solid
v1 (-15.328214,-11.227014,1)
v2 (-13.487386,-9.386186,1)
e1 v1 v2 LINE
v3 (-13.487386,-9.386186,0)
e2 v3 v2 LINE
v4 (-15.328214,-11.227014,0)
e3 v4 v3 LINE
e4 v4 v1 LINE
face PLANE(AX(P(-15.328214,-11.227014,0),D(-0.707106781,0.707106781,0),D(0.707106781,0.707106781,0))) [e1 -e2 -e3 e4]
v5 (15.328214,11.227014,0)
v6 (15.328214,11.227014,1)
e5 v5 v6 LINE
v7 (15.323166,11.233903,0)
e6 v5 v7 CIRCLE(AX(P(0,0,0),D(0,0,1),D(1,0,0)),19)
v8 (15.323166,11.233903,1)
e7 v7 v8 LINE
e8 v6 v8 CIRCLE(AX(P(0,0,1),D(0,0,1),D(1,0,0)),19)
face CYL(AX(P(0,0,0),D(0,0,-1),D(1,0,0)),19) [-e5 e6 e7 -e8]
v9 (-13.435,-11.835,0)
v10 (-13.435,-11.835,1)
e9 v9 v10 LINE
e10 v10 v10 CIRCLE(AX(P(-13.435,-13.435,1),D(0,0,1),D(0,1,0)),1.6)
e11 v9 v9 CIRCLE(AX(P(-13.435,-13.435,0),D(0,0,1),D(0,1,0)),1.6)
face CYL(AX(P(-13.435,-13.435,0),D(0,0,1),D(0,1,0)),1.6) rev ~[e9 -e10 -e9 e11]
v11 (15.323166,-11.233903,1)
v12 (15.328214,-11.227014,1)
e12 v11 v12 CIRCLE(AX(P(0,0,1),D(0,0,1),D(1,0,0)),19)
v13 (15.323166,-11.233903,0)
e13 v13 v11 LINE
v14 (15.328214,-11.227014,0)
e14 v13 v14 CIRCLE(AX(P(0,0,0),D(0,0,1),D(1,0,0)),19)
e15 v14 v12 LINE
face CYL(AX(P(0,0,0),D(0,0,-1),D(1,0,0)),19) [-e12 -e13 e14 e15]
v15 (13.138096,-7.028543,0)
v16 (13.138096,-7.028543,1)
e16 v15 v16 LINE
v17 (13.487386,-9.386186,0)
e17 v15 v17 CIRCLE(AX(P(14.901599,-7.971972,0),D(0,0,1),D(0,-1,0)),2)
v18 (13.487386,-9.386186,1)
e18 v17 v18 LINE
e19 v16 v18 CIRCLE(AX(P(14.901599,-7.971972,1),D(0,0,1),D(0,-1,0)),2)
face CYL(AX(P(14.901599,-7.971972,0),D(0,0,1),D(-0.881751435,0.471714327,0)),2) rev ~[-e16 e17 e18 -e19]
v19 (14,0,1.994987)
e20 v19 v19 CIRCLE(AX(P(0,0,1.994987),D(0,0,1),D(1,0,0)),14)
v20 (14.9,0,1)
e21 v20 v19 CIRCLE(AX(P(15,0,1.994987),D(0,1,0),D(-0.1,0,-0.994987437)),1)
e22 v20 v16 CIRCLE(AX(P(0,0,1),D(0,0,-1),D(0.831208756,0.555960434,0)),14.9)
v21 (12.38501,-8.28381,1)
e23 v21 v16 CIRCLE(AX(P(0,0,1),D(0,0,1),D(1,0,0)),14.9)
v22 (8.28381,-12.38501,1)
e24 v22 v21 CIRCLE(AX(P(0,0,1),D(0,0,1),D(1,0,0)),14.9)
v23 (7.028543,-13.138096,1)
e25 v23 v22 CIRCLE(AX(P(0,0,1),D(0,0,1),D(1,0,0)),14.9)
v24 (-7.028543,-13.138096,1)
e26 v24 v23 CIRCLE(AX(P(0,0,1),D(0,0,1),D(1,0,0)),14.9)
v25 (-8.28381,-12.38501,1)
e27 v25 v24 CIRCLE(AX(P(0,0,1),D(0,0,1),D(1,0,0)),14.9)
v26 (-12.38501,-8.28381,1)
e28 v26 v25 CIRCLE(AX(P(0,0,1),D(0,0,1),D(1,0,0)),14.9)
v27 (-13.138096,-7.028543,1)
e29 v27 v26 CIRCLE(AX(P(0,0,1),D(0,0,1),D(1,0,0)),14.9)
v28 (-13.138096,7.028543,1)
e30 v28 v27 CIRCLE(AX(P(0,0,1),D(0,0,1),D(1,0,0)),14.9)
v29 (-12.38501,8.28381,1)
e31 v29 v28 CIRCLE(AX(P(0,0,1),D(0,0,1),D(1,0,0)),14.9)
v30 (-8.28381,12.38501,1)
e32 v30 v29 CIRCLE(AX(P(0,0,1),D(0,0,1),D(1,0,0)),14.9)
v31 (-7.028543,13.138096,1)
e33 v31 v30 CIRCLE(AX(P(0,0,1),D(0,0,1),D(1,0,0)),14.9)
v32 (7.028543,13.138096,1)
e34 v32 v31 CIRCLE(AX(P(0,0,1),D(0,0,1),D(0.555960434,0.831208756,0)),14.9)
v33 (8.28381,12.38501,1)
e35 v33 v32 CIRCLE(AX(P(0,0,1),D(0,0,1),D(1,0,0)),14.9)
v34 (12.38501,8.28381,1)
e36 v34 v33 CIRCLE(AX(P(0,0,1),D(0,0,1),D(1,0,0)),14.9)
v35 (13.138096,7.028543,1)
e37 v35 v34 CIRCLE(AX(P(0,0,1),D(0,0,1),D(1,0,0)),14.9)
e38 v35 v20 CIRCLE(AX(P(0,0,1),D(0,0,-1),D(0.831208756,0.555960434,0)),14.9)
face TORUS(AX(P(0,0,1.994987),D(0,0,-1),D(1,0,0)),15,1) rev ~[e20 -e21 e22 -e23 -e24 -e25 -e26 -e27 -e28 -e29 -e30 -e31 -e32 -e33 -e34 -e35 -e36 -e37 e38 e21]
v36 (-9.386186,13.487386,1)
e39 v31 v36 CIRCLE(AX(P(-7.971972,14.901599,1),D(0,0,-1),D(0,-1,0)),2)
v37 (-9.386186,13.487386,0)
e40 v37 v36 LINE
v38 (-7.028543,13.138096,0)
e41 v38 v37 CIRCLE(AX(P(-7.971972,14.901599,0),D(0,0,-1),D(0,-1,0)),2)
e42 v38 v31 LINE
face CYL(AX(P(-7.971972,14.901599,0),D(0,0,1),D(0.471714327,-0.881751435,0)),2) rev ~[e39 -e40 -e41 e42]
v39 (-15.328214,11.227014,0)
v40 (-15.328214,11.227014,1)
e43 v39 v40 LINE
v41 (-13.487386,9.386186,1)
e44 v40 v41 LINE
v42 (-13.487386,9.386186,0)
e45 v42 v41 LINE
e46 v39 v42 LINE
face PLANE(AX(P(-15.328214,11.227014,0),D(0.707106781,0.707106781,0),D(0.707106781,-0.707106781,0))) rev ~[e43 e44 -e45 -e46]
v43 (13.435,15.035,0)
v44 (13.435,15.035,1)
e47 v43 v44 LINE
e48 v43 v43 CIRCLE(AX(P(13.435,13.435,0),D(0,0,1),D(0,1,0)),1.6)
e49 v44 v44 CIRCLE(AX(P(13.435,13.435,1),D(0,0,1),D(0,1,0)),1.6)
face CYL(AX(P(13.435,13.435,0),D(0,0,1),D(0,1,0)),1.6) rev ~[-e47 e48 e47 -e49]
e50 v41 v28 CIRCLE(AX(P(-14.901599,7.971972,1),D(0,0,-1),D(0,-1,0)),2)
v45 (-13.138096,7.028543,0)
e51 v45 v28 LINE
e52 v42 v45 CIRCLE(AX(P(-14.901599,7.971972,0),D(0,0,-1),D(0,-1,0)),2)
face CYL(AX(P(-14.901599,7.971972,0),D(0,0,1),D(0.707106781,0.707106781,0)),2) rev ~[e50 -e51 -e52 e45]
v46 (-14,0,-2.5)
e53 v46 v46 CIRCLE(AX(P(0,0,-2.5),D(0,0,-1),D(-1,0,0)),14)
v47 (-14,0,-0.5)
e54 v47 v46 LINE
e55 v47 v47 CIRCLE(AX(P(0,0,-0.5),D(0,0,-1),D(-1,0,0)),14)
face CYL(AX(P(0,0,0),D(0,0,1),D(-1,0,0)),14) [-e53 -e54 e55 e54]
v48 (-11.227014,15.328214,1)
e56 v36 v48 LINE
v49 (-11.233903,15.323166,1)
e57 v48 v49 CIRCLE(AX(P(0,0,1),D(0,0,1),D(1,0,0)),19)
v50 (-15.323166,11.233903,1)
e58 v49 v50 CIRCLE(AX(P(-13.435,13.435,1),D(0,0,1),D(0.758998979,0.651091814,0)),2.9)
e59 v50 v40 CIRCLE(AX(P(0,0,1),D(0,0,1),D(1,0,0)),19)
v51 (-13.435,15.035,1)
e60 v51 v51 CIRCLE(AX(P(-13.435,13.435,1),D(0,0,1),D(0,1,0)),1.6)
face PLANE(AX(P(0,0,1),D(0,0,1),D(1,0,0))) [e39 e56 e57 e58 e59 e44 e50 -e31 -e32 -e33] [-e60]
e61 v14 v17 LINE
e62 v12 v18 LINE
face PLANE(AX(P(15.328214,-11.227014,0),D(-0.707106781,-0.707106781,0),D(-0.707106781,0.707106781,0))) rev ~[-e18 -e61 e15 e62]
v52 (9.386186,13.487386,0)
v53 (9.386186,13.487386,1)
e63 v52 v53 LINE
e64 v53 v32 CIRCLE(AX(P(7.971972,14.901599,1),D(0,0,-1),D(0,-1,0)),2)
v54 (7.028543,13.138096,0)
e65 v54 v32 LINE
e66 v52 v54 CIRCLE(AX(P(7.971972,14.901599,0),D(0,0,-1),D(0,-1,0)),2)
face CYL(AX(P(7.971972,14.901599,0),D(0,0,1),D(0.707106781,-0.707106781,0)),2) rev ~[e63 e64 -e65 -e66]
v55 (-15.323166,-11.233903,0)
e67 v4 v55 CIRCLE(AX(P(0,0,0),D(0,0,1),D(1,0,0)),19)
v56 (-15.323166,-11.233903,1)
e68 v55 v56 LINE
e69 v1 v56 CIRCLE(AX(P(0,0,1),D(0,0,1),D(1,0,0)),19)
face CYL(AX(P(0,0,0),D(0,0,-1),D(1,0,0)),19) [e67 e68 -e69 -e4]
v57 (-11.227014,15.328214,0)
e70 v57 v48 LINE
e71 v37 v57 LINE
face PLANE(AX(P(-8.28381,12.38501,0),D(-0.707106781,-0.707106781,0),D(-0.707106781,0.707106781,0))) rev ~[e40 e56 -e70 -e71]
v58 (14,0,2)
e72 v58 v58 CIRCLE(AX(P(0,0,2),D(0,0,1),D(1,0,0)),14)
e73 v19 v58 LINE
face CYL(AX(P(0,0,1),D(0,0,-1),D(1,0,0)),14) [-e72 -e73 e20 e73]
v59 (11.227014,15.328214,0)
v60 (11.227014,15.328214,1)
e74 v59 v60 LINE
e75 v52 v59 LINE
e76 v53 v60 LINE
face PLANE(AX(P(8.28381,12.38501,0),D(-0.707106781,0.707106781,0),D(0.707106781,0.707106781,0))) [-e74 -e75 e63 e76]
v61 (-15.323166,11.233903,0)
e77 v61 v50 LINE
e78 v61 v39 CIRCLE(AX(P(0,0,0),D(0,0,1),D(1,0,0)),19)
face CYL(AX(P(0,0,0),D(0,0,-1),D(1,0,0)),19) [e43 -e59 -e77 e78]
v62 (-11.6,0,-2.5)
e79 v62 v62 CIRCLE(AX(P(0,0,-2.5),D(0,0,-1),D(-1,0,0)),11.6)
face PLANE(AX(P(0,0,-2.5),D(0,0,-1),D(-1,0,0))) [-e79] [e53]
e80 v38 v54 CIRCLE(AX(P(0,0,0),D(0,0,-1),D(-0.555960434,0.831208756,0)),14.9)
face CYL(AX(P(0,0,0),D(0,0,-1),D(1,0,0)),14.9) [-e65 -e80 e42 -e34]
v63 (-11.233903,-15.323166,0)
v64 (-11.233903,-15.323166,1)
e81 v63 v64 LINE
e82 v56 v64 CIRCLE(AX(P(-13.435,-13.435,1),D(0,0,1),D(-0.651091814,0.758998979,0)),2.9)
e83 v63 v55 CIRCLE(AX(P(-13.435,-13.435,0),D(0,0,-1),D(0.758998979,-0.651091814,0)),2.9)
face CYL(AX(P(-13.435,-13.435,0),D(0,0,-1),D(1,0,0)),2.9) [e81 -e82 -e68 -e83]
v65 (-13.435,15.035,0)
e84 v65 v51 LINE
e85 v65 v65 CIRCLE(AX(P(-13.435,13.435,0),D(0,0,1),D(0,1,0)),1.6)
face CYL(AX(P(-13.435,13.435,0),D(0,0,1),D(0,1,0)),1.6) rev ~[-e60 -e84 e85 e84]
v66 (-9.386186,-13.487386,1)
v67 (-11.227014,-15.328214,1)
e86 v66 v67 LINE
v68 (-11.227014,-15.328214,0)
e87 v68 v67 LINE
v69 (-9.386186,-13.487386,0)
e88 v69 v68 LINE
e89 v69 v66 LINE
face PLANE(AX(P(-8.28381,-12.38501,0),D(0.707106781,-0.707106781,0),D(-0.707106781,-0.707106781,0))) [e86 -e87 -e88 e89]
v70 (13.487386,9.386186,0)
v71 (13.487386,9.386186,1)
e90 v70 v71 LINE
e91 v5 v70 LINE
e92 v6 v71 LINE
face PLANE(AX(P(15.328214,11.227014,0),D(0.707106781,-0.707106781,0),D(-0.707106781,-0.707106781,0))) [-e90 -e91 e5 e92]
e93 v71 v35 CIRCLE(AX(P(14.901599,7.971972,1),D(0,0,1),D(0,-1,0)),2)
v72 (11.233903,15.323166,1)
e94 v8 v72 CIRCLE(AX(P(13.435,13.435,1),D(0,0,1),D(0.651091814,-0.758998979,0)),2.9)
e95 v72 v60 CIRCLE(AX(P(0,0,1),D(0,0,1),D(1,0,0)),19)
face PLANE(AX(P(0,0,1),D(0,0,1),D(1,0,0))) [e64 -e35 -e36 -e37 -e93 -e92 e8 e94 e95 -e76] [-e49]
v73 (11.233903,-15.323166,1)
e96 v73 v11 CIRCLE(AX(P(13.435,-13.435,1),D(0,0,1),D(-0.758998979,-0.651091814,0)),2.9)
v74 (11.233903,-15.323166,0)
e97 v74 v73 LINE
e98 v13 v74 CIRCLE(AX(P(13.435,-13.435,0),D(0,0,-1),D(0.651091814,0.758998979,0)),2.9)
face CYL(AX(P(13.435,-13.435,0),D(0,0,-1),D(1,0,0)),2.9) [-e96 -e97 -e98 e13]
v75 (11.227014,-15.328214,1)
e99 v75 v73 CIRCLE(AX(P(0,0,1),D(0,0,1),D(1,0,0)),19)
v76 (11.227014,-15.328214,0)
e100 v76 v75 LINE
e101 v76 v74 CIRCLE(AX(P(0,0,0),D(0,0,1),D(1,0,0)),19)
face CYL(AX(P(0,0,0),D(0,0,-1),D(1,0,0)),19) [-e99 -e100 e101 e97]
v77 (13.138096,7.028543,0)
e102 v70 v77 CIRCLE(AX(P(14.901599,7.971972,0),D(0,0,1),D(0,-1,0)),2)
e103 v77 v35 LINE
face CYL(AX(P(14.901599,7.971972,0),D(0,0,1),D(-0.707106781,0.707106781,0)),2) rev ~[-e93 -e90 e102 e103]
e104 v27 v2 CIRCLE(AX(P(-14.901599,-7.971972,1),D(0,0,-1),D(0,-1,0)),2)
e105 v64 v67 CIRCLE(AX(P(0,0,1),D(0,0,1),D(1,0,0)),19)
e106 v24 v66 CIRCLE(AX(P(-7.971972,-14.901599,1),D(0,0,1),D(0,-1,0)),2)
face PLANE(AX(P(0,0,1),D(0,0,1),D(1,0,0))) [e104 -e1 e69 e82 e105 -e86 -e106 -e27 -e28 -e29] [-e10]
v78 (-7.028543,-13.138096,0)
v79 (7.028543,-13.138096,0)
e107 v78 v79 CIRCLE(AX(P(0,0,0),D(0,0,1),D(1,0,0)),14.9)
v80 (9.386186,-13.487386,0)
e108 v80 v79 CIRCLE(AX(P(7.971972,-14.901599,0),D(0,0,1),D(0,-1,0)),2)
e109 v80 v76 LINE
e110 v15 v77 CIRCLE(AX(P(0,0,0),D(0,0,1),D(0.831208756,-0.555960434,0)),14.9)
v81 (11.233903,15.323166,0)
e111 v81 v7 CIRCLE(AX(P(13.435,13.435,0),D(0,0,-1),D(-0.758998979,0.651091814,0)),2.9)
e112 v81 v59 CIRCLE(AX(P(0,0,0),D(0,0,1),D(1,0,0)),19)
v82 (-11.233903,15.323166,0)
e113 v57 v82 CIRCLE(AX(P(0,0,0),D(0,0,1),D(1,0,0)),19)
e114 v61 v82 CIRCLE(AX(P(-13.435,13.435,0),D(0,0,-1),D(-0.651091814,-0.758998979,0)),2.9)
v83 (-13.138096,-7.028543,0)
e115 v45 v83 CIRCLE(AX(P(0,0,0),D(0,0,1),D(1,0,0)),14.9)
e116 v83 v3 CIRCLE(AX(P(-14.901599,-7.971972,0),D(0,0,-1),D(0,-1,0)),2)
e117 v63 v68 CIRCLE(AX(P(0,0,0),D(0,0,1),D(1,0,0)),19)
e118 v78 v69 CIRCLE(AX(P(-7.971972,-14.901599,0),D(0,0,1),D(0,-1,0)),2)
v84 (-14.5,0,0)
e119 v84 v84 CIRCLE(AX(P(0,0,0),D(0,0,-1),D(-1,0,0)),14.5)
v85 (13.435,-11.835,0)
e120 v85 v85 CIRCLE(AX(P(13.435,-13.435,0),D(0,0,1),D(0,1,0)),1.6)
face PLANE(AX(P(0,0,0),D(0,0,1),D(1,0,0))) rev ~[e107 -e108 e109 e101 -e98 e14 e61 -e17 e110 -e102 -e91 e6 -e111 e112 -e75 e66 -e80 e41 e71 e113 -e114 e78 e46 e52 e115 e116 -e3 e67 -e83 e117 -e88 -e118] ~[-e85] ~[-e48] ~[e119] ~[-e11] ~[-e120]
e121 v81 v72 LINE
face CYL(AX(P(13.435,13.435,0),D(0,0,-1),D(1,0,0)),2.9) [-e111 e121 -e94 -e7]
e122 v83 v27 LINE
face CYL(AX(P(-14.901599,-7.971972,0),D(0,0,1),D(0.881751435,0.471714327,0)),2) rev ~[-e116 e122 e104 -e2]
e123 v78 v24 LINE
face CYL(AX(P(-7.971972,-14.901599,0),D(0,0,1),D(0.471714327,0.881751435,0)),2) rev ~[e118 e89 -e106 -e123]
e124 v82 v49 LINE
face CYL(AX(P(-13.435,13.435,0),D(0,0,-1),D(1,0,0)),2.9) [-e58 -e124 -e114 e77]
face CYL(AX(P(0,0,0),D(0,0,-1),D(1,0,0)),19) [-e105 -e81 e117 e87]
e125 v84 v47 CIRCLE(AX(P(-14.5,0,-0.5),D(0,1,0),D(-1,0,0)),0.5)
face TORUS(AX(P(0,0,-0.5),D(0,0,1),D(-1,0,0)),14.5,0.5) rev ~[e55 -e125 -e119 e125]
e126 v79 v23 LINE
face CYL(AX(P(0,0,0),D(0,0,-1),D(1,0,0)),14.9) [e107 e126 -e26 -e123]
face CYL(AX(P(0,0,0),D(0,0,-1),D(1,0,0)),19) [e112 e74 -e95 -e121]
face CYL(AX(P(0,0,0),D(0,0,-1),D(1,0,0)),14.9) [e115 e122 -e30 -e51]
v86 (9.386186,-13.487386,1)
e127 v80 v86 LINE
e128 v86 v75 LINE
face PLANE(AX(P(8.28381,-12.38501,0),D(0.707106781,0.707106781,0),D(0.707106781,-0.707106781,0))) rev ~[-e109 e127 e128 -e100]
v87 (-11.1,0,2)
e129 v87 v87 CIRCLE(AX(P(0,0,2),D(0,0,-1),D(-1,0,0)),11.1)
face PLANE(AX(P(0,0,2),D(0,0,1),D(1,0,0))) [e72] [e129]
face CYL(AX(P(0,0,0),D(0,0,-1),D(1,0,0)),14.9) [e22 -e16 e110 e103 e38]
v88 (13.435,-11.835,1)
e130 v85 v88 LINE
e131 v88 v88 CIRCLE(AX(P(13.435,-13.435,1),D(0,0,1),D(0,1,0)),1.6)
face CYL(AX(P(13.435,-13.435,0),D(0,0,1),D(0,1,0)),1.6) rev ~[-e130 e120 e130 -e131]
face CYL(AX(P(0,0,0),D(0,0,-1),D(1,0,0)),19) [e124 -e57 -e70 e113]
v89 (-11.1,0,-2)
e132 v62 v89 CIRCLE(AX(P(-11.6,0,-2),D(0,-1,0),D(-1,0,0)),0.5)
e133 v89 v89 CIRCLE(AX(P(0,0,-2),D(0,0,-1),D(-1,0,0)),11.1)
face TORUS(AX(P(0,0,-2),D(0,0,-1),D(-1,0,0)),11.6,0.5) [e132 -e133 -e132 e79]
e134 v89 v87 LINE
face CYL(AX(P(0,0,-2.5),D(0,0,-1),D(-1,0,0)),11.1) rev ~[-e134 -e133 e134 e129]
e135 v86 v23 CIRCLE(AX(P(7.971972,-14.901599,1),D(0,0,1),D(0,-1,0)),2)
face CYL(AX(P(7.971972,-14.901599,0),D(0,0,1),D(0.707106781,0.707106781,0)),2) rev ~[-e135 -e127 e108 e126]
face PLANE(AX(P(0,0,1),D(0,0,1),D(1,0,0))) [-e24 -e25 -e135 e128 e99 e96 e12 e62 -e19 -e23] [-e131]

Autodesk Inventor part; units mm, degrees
ref_plane "YZ Plane" through (0, 0, 0) normal (1, 0, 0) x (0, 1, 0)
ref_plane "XZ Plane" through (0, 0, 0) normal (0, 1, 0) x (-1, 0, 0)
ref_plane "XY Plane" through (0, 0, 0) normal (0, 0, 1) x (1, 0, 0)
sketch "スケッチ1" plane through (0, 0, 0) normal (0, 0, 1) x (1, 0, 0)
  circle A0 centre (0, 0) radius 19
  line L0 (0, 0) -> (0, 19)
  line L1 (0, 0) -> (13.435, 13.435)
  circle A1 centre (13.435, 13.435) radius 2.9
  circle A2 centre (-13.435, 13.435) radius 2.9
  circle A3 centre (-13.435, -13.435) radius 2.9
  circle A4 centre (13.435, -13.435) radius 2.9
  circle A5 centre (0, 0) radius 14.9
  line L2 (15.4856, -11.3844) -> (-11.3844, 15.4856)
  line L3 (-15.4856, 11.3844) -> (11.3844, -15.4856)
  line L4 (-15.4856, -11.3844) -> (11.3844, 15.4856)
  line L5 (15.4856, 11.3844) -> (-11.3844, -15.4856)
  point P0 (-11.2339, 15.3232)
  point P1 (-15.3232, 11.2339)
  point P2 (-15.3282, 11.227)
  point P3 (-12.385, 8.2838)
  point P4 (-12.385, -8.2838)
  point P5 (-15.3282, -11.227)
  point P6 (-15.3232, -11.2339)
  point P7 (-11.2339, -15.3232)
  point P8 (-11.227, -15.3282)
  point P9 (-8.2838, -12.385)
  point P10 (8.2838, -12.385)
  point P11 (11.227, -15.3282)
  point P12 (11.2339, -15.3232)
  point P13 (15.3232, -11.2339)
  point P14 (15.3282, -11.227)
  point P15 (12.385, -8.2838)
  point P16 (12.385, 8.2838)
  point P17 (15.3282, 11.227)
  point P18 (15.3232, 11.2339)
  point P19 (11.2339, 15.3232)
  point P20 (11.227, 15.3282)
  point P21 (8.2838, 12.385)
  point P22 (-8.2838, 12.385)
  point P23 (-11.227, 15.3282)
  dimension "d0" = 38
  dimension "d1" = 45
  dimension "d2" = 5.8
  dimension "d5" = 360
  dimension "d7" = 29.8
extrude "押し出し1" add sketch "スケッチ1" along normal blind 1 contours L5 A5 L1 A1 A0 | A0 A4 L3 A5 L2 | A1 L1 A0 | A0 A1 | L5 L2 L1 A5 | A5 L2 L5 | A4 A0 | A0 A4 | A5 L3 L5 L2 | L1 A1 A0 | L1 A5 L4 A0 A1 | L1 L2 L4 A5 | L5 L3 L4 L0 L1 L2 | A5 L5 L3 | L1 L0 L2 | L4 L0 A5 | L5 A5 L4 L3 | L5 A0 A3 L4 A5 | L2 A5 L0 | L4 L3 A5 L2 | L4 A5 L3 | A5 L3 A0 A2 L2 | A3 A0 | A0 A3 | A2 A0 | A0 A2
sketch "スケッチ2" plane through (0, 0, 1) normal (0, 0, 1) x (1, 0, 0)
  circle A0 centre (0, 0) radius 14
  dimension "d10" = 28
extrude "押し出し2" add sketch "スケッチ2" along normal blind 1
sketch "スケッチ3" plane through (0, 0, 0) normal (0, 0, -1) x (-1, 0, 0)
  circle A0 centre (0, 0) radius 14
  dimension "d13" = 28
extrude "押し出し3" add sketch "スケッチ3" along normal blind 2.5
sketch "スケッチ4" plane through (0, 0, -2.5) normal (0, 0, -1) x (-1, 0, 0)
  circle A0 centre (0, 0) radius 11.1
  dimension "d16" = 22.2
extrude "押し出し4" cut sketch "スケッチ4" against normal blind 6
sketch "スケッチ5" plane through (0, 0, -1) normal (0, 0, -1) x (-1, 0, 0)
  circle A0 centre (0, 0) radius 11
  dimension "d19" = 22
extrude "押し出し5" [suppressed]
fillet "フィレット1" radius 1 1 edges at (-14, 0, 1)
sketch "スケッチ6" plane through (0, 0, 0) normal (0, 0, -1) x (-1, 0, 0)
  arc A0 (-15.3232, -11.2339) -> (-11.2339, -15.3232) centre (-13.435, -13.435) ccw projected
  arc A1 (11.2339, -15.3232) -> (15.3232, -11.2339) centre (13.435, -13.435) ccw projected
  arc A2 (15.3232, 11.2339) -> (11.2339, 15.3232) centre (13.435, 13.435) ccw projected
  arc A3 (-11.2339, 15.3232) -> (-15.3232, 11.2339) centre (-13.435, 13.435) ccw projected
  point P0 (0, 0)
hole "穴1" at (13.435, -13.435, 0) at (-13.435, -13.435, 0) at (-13.435, 13.435, 0) at (13.435, 13.435, 0) direction (0, 0, 1) diameter 3.2 end through all
fillet "フィレット2" radius 2 8 edges at (12.385, 8.2838, 0.5) (12.385, -8.2838, 0.5) (8.2838, -12.385, 0.5) (-8.2838, -12.385, 0.5) (-12.385, -8.2838, 0.5) (-8.2838, 12.385, 0.5) (-12.385, 8.2838, 0.5) (8.2838, 12.385, 0.5)
fillet "フィレット3" radius 0.5 1 edges at (14, 0, 0)
fillet "フィレット4" radius 0.5 1 edges at (11.1, 0, -2.5)
properties part number "servohorn_support_forR0"
